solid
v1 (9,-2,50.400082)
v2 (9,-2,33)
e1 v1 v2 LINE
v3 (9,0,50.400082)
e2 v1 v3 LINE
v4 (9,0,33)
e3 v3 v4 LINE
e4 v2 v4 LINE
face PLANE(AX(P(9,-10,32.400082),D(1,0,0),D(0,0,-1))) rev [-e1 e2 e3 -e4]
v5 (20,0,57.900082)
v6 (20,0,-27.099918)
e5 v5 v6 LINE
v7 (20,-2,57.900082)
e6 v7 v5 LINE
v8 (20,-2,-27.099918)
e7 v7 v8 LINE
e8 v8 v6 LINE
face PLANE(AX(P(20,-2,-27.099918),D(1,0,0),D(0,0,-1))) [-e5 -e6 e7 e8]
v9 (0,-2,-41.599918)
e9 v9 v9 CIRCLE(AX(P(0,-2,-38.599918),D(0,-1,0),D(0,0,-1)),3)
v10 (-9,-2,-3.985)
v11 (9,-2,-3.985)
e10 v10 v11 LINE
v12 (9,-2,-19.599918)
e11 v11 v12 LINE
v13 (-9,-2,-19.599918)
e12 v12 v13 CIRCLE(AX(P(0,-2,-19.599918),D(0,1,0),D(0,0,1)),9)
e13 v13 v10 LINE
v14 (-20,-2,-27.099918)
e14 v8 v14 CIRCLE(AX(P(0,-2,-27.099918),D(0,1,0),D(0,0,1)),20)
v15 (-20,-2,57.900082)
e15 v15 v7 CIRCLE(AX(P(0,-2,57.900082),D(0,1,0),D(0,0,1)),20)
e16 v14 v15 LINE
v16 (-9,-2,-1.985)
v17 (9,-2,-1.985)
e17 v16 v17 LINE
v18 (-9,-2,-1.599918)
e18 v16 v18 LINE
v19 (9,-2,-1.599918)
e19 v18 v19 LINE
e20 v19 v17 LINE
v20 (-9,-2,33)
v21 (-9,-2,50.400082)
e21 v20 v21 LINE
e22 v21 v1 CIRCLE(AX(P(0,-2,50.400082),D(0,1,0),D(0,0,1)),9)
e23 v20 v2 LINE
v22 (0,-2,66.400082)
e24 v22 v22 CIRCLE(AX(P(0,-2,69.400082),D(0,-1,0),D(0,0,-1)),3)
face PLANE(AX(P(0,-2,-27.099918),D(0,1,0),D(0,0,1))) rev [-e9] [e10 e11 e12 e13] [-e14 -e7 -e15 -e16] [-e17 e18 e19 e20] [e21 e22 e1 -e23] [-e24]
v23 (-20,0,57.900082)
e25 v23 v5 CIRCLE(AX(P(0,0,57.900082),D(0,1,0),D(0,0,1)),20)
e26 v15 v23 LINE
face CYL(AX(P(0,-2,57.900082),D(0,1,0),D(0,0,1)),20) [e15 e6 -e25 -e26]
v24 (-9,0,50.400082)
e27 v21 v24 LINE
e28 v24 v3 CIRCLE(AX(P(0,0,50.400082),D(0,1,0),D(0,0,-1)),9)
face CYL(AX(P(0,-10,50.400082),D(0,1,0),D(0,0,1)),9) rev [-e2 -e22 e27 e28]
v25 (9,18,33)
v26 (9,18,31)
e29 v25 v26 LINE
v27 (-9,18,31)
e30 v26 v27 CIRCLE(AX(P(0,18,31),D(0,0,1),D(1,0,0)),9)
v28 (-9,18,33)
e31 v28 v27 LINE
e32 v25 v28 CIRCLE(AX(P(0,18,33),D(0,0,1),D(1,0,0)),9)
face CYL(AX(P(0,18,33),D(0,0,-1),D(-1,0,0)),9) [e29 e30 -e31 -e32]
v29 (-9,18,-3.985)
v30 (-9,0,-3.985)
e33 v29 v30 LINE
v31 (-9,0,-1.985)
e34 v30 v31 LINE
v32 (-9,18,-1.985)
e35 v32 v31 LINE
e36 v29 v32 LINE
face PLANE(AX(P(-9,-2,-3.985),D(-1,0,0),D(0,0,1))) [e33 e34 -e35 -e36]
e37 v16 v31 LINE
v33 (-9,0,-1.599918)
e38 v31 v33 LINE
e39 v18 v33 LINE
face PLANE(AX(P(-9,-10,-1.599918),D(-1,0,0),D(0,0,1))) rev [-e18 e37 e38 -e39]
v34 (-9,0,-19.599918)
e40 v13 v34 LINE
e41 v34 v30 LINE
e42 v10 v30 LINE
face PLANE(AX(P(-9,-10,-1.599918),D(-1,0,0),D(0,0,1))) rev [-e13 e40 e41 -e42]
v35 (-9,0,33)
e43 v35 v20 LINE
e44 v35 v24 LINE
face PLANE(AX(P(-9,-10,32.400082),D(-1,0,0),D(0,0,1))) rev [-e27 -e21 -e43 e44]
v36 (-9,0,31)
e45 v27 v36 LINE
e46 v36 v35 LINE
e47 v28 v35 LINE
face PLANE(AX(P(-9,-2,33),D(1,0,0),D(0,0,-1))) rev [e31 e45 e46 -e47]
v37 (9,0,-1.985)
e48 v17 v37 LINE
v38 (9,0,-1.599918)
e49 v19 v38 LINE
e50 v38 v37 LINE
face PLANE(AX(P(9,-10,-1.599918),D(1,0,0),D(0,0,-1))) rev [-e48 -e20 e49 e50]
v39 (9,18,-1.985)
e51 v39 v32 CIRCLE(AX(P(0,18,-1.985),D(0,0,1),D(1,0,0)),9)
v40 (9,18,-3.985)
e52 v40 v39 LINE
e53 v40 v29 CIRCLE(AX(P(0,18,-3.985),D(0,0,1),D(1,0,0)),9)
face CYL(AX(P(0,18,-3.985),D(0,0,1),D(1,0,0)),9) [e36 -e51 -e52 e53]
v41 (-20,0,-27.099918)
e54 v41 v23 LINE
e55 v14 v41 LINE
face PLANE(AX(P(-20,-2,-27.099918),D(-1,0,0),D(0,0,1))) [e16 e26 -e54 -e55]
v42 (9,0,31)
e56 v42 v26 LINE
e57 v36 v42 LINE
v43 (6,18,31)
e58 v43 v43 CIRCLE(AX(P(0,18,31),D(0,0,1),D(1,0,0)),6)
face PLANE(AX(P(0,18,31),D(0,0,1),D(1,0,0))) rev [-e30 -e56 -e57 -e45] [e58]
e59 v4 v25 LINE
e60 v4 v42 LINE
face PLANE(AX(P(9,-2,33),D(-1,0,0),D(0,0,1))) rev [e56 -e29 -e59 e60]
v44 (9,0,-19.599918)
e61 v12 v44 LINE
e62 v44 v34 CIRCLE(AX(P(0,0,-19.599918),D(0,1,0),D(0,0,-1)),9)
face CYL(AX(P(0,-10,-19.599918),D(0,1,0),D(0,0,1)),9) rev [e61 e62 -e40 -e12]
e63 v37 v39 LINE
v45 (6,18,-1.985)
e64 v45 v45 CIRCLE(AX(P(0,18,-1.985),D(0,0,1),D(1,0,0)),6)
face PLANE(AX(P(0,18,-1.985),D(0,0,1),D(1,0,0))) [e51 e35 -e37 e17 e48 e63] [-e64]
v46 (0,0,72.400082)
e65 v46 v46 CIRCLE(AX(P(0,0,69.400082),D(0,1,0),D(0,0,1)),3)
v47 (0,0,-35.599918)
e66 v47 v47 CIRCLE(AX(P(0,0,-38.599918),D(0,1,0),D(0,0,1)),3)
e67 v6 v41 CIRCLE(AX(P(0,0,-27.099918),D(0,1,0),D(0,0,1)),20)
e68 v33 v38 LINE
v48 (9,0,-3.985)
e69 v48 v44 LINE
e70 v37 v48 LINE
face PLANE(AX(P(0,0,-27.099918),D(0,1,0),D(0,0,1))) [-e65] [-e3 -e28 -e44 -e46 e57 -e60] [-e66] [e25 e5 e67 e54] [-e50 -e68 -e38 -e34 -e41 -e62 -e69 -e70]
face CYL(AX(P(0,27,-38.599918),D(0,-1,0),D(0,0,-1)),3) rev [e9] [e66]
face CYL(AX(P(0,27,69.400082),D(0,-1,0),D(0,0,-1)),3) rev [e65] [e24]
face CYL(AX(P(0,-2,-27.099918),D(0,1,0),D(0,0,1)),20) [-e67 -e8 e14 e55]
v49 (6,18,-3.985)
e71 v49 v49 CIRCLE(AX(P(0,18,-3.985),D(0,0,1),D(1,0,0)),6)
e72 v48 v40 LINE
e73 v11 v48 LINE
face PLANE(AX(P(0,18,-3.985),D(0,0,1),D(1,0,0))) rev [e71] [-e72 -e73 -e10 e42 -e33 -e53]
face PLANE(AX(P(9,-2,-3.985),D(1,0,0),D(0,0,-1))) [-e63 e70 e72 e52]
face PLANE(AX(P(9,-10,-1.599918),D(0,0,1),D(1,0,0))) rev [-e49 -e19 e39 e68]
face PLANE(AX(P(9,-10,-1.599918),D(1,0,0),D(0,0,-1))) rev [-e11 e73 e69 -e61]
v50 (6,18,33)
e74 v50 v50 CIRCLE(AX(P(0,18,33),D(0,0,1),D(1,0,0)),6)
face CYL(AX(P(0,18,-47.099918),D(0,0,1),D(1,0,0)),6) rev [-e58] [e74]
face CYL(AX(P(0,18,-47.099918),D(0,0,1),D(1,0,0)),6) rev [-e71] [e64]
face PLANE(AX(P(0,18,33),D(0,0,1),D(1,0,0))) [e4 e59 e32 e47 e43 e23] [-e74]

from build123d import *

# Parameters (mm, degrees)
BASE_FLANGE1_DEPTH  = 2
CUT_EXTRUDE13_DEPTH = 10
BOSS_EXTRUDE4_DEPTH = 2
BOSS_EXTRUDE5_START = -2
BOSS_EXTRUDE5_DEPTH = 2
SKETCH18_R          = 6
CUT_EXTRUDE14_DEPTH = 87.861941803
SKETCH19_R          = 3
CUT_EXTRUDE15_DEPTH = 86.495161894


# Sheet-metal steps are written as plain solids
with BuildPart() as part:
    # Sketch2 → Base-Flange1 (new body)
    with BuildSketch(Plane(origin=(0, 0, 0), x_dir=(1, 0, 0), z_dir=(0, 1, 0))):
        with BuildLine():
            Line((20, 27.099918438), (20, -57.900081562))
            ThreePointArc((20, -57.900081562), (0, -77.900081562), (-20, -57.900081562))
            Line((-20, -57.900081562), (-20, 27.099918438))
            ThreePointArc((-20, 27.099918438), (0, 47.099918438), (20, 27.099918438))
        make_face()
    extrude(amount=-BASE_FLANGE1_DEPTH)

    # Sketch9 → Cut-Extrude13 (cut)
    with BuildSketch(Plane(origin=(0, 0, 0), x_dir=(1, 0, 0), z_dir=(0, 1, 0))):
        with BuildLine():
            Line((9, 1.599918438), (-9, 1.599918438))
            Line((-9, 1.599918438), (-9, 19.599918438))
            ThreePointArc((-9, 19.599918438), (0, 28.599918438), (9, 19.599918438))
            Line((9, 19.599918438), (9, 1.599918438))
        make_face()
        with BuildLine():
            Line((-9, -32.400081562), (9, -32.400081562))
            Line((9, -32.400081562), (9, -50.400081562))
            ThreePointArc((9, -50.400081562), (0, -59.400081562), (-9, -50.400081562))
            Line((-9, -50.400081562), (-9, -32.400081562))
        make_face()
    extrude(amount=-CUT_EXTRUDE13_DEPTH, mode=Mode.SUBTRACT)

    # Sketch16 → Boss-Extrude4 (add)
    with BuildSketch(Plane.XY.offset(31)):
        with BuildLine():
            Line((-9, -2), (-9, 18))
            ThreePointArc((-9, 18), (0, 27), (9, 18))
            Line((9, 18), (9, -2))
            Line((9, -2), (-9, -2))
        make_face()
    extrude(amount=BOSS_EXTRUDE4_DEPTH)

    # Sketch17 → Boss-Extrude5 (add)
    with BuildSketch(Plane.XY.offset(-1.985).offset(BOSS_EXTRUDE5_START)):
        with BuildLine():
            Line((9, -2), (9, 18))
            ThreePointArc((9, 18), (0, 27), (-9, 18))
            Line((-9, 18), (-9, -2))
            Line((-9, -2), (9, -2))
        make_face()
    extrude(amount=BOSS_EXTRUDE5_DEPTH)

    # Sketch18 → Cut-Extrude14 (cut, through all)
    with BuildSketch(Plane.XY.offset(33)):
        with Locations((0, 18)):
            Circle(SKETCH18_R)
    extrude(amount=-CUT_EXTRUDE14_DEPTH, mode=Mode.SUBTRACT)

    # Sketch19 → Cut-Extrude15 (cut, through all)
    with BuildSketch(Plane.XZ.offset(2)):
        with Locations(Location((0, 69.400081562, 0), (0, 0, 270))):
            Circle(SKETCH19_R)
        with Locations(Location((0, -38.599918438, 0), (0, 0, 270))):
            Circle(SKETCH19_R)
    extrude(amount=-CUT_EXTRUDE15_DEPTH, mode=Mode.SUBTRACT)


solid = part.part
